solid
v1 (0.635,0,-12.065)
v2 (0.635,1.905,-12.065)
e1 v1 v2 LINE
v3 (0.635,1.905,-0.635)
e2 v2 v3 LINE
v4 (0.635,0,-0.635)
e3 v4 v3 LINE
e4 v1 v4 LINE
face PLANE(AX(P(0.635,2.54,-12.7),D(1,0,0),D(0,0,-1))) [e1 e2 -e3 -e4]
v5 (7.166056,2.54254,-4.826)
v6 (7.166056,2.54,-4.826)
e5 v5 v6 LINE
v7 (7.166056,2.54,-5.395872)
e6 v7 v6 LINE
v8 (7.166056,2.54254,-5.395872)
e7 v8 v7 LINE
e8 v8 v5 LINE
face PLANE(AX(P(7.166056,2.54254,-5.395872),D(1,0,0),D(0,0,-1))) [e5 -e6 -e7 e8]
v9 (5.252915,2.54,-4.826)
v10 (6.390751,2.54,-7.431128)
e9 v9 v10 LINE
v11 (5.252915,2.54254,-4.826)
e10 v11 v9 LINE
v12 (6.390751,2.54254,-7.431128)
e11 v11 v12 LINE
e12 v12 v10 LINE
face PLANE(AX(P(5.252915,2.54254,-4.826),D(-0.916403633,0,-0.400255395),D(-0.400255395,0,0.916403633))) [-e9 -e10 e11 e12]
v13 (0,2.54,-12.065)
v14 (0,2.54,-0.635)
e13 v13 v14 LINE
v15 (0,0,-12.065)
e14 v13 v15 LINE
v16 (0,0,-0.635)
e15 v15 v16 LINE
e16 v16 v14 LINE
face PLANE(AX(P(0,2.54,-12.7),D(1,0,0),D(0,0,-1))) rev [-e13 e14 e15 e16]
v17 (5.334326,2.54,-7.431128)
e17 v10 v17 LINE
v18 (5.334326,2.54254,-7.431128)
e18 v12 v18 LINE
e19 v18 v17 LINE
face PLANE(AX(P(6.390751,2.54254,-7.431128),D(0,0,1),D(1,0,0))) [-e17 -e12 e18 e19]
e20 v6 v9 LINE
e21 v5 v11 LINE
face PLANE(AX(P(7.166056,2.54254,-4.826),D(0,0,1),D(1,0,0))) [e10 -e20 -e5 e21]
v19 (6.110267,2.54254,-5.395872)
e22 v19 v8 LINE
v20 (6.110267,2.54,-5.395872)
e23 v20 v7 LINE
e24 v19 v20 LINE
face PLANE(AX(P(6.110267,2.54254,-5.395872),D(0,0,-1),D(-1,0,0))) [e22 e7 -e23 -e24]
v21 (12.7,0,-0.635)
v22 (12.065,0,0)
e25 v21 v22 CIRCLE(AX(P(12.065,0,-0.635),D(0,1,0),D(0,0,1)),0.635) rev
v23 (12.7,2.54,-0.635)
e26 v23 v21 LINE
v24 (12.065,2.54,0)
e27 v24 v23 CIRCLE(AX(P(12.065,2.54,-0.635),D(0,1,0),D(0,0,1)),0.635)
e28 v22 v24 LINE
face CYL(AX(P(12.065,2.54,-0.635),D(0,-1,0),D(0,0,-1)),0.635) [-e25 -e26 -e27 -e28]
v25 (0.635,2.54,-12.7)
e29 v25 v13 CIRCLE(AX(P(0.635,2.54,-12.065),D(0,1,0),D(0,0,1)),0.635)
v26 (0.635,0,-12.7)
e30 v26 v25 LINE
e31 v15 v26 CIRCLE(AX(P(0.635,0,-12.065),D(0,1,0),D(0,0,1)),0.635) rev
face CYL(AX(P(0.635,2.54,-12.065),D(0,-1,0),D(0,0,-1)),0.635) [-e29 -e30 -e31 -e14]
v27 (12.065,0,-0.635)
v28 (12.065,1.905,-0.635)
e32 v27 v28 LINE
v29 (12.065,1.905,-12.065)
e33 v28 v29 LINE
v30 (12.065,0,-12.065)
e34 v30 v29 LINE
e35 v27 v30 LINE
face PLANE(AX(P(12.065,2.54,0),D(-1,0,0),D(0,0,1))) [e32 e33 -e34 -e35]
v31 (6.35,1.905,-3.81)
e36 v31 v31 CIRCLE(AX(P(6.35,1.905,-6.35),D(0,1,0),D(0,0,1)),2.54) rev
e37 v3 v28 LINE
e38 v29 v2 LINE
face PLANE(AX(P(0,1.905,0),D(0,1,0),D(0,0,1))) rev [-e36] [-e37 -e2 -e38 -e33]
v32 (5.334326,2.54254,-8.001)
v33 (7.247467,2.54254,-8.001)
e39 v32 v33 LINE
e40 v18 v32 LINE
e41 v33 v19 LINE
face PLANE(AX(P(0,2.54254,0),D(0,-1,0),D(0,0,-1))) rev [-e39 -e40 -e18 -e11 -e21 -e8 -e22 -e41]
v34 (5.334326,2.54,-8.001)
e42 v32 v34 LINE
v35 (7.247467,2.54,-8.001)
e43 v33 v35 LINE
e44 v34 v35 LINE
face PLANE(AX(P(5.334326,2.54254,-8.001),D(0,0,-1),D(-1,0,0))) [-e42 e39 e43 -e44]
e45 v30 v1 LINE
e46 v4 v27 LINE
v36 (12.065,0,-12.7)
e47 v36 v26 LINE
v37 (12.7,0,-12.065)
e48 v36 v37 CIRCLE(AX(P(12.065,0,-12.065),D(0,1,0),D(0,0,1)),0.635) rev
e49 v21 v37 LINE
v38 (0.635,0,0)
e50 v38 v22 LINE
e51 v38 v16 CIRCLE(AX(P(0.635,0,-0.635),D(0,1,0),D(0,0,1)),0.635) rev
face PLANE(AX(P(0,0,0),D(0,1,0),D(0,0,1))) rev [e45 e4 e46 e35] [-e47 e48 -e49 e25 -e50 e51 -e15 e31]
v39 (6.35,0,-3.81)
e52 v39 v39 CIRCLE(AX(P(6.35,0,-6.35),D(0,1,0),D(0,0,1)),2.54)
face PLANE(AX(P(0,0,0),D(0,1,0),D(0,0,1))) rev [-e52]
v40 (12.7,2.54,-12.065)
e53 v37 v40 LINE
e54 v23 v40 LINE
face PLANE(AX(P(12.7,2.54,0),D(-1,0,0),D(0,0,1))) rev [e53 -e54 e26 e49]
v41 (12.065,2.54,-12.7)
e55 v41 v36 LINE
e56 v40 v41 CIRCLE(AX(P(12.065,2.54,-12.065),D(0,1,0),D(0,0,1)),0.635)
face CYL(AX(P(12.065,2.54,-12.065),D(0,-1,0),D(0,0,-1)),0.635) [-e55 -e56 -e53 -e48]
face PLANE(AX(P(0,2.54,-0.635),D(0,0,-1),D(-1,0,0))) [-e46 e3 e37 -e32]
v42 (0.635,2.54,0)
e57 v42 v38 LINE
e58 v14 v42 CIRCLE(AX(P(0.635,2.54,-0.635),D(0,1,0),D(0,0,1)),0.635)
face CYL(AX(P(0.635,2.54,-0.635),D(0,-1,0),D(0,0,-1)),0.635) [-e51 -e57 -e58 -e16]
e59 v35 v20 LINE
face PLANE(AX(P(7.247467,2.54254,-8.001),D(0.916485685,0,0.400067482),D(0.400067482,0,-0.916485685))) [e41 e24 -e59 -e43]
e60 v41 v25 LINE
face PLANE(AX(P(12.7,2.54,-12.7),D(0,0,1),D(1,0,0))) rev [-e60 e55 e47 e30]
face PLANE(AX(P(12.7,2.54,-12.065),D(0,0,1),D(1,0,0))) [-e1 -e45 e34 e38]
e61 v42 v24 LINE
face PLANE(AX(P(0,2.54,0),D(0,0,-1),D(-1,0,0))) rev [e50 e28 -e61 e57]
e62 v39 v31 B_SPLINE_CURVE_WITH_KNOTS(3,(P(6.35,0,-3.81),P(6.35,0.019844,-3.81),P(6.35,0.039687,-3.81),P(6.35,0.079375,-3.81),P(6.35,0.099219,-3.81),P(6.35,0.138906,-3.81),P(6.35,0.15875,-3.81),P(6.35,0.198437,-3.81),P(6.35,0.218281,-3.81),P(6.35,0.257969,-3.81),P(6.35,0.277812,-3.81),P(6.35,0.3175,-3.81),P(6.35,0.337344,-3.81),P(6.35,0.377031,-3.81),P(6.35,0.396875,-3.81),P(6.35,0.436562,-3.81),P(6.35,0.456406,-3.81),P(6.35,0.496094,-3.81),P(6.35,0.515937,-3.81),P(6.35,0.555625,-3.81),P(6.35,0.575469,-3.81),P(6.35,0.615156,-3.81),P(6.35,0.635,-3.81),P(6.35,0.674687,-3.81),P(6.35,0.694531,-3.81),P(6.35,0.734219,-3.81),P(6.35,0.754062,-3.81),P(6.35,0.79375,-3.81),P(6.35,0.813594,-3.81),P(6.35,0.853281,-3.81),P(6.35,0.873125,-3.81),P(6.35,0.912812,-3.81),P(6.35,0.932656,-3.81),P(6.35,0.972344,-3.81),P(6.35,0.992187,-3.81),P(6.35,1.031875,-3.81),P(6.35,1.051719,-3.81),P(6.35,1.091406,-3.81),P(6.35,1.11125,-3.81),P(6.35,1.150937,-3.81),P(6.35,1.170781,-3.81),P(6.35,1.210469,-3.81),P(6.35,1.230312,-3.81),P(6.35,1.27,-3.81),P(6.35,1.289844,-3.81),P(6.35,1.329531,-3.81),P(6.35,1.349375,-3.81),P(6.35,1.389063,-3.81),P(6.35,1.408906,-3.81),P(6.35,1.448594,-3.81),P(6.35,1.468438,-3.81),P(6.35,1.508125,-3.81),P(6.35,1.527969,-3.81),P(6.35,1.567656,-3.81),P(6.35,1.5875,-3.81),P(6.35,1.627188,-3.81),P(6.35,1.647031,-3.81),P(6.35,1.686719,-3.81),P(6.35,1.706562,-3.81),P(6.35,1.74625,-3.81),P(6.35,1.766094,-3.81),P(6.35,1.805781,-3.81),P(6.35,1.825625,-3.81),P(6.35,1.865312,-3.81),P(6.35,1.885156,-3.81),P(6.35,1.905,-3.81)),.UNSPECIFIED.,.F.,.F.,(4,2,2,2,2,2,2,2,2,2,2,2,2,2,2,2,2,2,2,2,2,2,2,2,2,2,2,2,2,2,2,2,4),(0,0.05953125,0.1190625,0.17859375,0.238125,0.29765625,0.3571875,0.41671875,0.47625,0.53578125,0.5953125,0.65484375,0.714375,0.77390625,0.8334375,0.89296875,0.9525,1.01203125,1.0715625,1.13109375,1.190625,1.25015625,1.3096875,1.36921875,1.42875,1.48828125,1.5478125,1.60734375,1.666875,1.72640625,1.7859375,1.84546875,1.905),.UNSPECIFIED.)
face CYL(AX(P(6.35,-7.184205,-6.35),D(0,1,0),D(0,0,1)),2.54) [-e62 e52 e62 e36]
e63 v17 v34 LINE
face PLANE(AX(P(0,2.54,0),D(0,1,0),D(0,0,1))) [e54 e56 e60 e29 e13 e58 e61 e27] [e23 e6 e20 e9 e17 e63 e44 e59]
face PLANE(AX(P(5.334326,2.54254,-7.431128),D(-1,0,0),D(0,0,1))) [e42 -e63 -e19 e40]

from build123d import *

# Parameters (mm, degrees)
SKETCH1_W           = 12.7
SKETCH1_H           = 12.7
BOSS_EXTRUDE1_DEPTH = 2.54
FILLET1_R           = 0.635
SHELL1_START        = 0.635
SHELL1_OUTLINE_W    = 1.905
SHELL1_OUTLINE_H    = 11.43
SHELL1_DEPTH        = 11.43
SKETCH2_R           = 2.54
BOSS_EXTRUDE2_DEPTH = 1.905
BOSS_EXTRUDE3_DEPTH = 0.00254


# Read off the part's stored shape, not the designer's step: Shell1
with BuildPart() as part:
    # Sketch1 → Boss-Extrude1 (new body)
    with BuildSketch(Plane(origin=(0, 0, 0), x_dir=(1, 0, 0), z_dir=(0, 1, 0))):
        with Locations((6.35, 6.35)):
            Rectangle(SKETCH1_W, SKETCH1_H)
    extrude(amount=BOSS_EXTRUDE1_DEPTH)

    # Fillet1
    fillet1_edges = [part.edges().sort_by_distance(p)[0] for p in [
        (0, 1.27, -12.7),
        (12.7, 1.27, -12.7),
        (12.7, 1.27, 0),
        (0, 1.27, 0),
    ]]
    fillet(fillet1_edges, radius=FILLET1_R)

    # Shell1 outline → Shell1 (cut)
    with BuildSketch(Plane.YZ.offset(SHELL1_START)):
        with Locations((0.9525, -6.35)):
            Rectangle(SHELL1_OUTLINE_W, SHELL1_OUTLINE_H)
    extrude(amount=SHELL1_DEPTH, mode=Mode.SUBTRACT)

    # Sketch2 → Boss-Extrude2 (add)
    with BuildSketch(Plane(origin=(0, 1.905, 0), x_dir=(-1, 0, 0), z_dir=(0, -1, 0))):
        with Locations(Location((-6.35, 6.35, 0), (0, 0, 270))):
            Circle(SKETCH2_R)
    extrude(amount=BOSS_EXTRUDE2_DEPTH)

    # Sketch3 → Boss-Extrude3 (add)
    with BuildSketch(Plane(origin=(0, 2.54, 0), x_dir=(1, 0, 0), z_dir=(0, 1, 0))):
        Polygon((5.334325641, 8.001), (7.247466667, 8.001), (6.110267147, 5.395871795), (7.16605641, 5.395871795), (7.16605641, 4.826), (5.252915385, 4.826), (6.390750921, 7.431128205), (5.334325641, 7.431128205), align=None)
    extrude(amount=BOSS_EXTRUDE3_DEPTH)


solid = part.part
